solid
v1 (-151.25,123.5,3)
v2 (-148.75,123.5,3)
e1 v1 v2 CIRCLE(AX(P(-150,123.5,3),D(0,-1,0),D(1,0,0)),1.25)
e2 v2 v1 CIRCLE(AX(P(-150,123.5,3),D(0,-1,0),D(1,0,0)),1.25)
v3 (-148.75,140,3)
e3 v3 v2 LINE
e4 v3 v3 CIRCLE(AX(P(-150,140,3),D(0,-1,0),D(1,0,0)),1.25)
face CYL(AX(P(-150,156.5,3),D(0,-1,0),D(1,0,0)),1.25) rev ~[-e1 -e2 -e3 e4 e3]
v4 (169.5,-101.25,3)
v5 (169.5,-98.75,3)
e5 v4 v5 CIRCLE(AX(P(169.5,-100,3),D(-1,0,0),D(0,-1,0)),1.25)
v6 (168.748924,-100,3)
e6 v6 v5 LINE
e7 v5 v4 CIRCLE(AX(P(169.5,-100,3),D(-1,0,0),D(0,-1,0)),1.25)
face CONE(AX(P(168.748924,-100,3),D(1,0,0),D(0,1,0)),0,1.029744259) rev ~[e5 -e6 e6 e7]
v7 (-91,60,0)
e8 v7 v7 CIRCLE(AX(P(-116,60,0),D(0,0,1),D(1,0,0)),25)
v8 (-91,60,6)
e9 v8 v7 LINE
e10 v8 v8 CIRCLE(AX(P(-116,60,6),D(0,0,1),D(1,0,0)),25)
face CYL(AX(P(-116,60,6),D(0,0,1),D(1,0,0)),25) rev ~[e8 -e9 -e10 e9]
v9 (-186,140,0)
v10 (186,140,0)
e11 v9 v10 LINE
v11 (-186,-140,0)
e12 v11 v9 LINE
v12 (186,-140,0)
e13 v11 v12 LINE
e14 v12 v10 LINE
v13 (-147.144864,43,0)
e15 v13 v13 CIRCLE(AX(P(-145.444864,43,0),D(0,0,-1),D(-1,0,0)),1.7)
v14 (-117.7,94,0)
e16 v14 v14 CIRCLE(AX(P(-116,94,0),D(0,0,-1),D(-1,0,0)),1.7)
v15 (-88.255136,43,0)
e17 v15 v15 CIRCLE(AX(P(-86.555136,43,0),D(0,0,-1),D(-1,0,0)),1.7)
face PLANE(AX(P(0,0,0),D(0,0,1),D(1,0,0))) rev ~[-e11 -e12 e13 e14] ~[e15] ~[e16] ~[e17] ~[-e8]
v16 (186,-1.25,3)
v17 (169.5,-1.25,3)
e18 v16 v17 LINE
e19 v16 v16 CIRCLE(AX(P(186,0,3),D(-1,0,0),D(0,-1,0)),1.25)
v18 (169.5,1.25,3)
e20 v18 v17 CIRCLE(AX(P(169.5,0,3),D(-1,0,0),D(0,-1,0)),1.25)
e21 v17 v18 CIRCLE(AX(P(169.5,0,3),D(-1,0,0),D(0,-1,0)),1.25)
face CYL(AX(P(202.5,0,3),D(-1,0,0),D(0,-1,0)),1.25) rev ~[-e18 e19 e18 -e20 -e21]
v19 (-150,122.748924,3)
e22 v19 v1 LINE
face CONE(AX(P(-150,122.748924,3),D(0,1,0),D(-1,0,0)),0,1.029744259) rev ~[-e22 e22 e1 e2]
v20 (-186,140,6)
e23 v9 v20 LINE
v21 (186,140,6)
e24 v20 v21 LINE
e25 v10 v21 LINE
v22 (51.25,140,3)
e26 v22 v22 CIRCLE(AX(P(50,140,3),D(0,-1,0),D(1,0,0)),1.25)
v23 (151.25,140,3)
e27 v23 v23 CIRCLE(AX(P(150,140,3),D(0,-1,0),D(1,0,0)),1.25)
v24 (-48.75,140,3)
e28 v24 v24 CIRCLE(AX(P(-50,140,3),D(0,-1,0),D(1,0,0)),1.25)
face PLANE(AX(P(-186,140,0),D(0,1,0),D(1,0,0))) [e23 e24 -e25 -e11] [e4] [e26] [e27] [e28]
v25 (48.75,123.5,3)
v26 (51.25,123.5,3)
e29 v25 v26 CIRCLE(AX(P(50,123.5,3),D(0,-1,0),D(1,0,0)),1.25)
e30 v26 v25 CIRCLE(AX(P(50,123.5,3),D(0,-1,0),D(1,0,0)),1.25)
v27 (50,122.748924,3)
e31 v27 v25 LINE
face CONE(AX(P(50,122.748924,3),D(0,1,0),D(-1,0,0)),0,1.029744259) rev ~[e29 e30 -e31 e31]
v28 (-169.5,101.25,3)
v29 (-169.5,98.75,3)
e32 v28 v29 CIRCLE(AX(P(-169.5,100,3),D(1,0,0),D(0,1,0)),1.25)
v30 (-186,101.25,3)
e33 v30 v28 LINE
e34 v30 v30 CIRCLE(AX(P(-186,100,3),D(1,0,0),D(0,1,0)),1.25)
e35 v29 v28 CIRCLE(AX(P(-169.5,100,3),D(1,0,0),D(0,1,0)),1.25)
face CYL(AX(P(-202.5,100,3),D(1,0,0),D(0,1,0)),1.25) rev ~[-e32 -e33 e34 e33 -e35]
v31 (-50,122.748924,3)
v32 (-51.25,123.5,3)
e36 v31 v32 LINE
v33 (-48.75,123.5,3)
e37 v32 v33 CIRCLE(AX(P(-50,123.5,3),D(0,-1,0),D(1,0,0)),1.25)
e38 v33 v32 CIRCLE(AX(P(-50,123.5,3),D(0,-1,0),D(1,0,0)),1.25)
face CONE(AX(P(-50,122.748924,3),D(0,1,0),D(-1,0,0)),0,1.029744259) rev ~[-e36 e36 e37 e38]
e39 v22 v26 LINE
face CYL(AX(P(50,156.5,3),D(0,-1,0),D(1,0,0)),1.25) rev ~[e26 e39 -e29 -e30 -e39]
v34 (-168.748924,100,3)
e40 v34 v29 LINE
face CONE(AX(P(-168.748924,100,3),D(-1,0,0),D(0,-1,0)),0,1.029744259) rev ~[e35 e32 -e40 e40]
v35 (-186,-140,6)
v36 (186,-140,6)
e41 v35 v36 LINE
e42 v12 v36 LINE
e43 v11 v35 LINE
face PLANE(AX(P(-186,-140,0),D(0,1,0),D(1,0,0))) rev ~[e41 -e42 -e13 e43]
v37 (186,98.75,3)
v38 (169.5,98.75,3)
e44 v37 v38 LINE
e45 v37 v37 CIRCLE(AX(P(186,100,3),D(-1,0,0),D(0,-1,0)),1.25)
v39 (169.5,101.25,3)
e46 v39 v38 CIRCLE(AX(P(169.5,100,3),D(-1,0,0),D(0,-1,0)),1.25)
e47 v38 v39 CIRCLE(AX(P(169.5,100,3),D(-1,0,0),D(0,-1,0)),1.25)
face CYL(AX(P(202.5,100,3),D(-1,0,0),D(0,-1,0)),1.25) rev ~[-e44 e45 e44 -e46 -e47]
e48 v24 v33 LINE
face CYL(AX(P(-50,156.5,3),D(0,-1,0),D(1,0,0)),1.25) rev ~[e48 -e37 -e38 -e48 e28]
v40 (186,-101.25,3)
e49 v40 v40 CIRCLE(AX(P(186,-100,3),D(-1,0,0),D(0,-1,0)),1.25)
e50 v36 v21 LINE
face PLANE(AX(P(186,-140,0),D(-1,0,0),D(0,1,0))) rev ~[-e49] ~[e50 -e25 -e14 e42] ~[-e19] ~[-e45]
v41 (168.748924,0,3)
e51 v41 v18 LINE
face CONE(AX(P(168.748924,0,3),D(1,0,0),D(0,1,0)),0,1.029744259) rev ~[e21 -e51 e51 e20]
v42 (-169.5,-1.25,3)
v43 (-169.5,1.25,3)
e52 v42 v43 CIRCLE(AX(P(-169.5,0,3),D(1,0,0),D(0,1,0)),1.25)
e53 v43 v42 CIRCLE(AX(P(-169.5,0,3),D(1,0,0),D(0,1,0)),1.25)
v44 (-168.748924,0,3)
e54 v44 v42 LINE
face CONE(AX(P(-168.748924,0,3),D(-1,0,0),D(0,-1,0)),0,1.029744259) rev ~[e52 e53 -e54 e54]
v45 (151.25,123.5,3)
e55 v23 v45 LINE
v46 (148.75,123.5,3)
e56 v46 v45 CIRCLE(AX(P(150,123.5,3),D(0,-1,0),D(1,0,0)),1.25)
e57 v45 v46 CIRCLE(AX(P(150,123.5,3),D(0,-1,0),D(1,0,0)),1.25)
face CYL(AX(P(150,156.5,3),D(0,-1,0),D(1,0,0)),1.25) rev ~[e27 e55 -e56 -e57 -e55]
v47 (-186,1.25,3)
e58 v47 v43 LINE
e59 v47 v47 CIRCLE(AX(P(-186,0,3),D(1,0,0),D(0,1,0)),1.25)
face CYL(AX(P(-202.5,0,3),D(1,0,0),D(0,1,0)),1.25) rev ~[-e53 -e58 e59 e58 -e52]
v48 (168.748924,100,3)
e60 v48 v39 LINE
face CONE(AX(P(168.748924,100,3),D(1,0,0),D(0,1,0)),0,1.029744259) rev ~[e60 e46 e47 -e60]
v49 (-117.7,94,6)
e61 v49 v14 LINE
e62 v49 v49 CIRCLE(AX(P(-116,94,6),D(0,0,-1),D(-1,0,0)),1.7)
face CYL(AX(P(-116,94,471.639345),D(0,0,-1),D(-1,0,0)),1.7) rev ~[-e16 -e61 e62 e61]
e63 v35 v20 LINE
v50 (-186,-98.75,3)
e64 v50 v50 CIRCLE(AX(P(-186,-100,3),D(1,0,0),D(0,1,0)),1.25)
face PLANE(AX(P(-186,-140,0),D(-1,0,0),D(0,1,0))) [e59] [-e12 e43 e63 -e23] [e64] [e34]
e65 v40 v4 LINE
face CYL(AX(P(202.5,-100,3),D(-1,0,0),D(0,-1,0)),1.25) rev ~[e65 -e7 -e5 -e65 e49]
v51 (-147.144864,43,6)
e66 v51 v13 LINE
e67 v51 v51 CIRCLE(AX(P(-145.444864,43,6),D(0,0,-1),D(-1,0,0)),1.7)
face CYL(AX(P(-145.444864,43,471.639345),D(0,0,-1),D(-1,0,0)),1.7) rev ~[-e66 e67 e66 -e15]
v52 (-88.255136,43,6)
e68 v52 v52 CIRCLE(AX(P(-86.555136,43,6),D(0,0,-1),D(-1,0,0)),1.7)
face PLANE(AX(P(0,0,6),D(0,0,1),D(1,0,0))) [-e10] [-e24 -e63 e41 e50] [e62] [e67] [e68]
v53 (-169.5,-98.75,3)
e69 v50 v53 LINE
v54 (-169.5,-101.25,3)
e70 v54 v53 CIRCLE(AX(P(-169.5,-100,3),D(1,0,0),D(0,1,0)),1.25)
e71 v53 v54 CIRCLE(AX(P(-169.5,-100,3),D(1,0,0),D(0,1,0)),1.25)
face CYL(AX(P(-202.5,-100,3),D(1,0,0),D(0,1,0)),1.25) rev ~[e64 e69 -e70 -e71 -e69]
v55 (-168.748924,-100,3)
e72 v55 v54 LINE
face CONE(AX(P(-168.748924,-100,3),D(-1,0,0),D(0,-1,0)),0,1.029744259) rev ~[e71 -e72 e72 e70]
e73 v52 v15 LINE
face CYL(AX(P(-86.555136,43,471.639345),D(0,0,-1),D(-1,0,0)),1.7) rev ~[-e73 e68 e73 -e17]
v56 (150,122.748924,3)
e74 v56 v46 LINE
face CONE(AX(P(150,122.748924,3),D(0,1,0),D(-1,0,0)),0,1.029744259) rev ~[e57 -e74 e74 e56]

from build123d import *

# Parameters (mm, degrees)
F0_W           = 372
F0_H           = 280
F1_DEPTH       = 6
F2_R           = 25
F3_DEPTH       = 6
F5_D           = 3.4
F9_D           = 2.5
F9_DEPTH       = 16.5
F9_TIP         = 0.7510757738
F9_ON_F8_D     = 2.5
F9_ON_F8_DEPTH = 16.5
F9_ON_F8_TIP   = 0.7510757738
F9_ON_F7_D     = 2.5
F9_ON_F7_DEPTH = 16.5
F9_ON_F7_TIP   = 0.7510757738
F10_D          = 2.5
F10_DEPTH      = 16.5
F10_TIP        = 0.7510757738


# Not quite as in the source:
# - a feature names something its author has since deleted; it is built from what else it names


with BuildPart() as f1:
    # F0 (on Top) → F1 (new body)
    with BuildSketch(Plane.XY):
        Rectangle(F0_W, F0_H)
    extrude(amount=F1_DEPTH)


with BuildPart() as f3:
    # F2 (on face) → F3 (new body)
    with BuildSketch(Plane.XY.offset(6)):
        with Locations((-116, 60)):
            Circle(F2_R)
    extrude(amount=-F3_DEPTH)


with BuildPart() as f1_1:
    add(f1.part)

    # F4: cut F3
    add(f3.part, mode=Mode.SUBTRACT)

    # F5 (through all)
    with Locations(Plane.XY.offset(6)):
        with Locations((-116, 94), (-145.4448637287, 43), (-86.5551362713, 43)):
            Hole(F5_D / 2)

    # F9
    with Locations(Plane.YZ.offset(186)):
        with Locations((-100, 3), (0, 3), (100, 3)):
            Hole(F9_D / 2, depth=F9_DEPTH)
            with Locations((0, 0, -(F9_DEPTH + F9_TIP / 2))):  # 118° drill point
                Cone(0, F9_D / 2, F9_TIP, mode=Mode.SUBTRACT)

    # F9 on F8
    with Locations(Plane(origin=(0, 140, 0), x_dir=(-1, 0, 0), z_dir=(0, 1, 0))):
        with Locations((-150, 3), (-50, 3), (50, 3)):
            Hole(F9_ON_F8_D / 2, depth=F9_ON_F8_DEPTH)
            with Locations((0, 0, -(F9_ON_F8_DEPTH + F9_ON_F8_TIP / 2))):  # 118° drill point
                Cone(0, F9_ON_F8_D / 2, F9_ON_F8_TIP, mode=Mode.SUBTRACT)

    # F9 on F7
    with Locations(Plane(origin=(-186, 0, 0), x_dir=(0, -1, 0), z_dir=(-1, 0, 0))):
        with Locations((-100, 3), (0, 3), (100, 3)):
            Hole(F9_ON_F7_D / 2, depth=F9_ON_F7_DEPTH)
            with Locations((0, 0, -(F9_ON_F7_DEPTH + F9_ON_F7_TIP / 2))):  # 118° drill point
                Cone(0, F9_ON_F7_D / 2, F9_ON_F7_TIP, mode=Mode.SUBTRACT)

    # F10
    with Locations(Plane(origin=(0, 140, 0), x_dir=(-1, 0, 0), z_dir=(0, 1, 0))):
        with Locations((150, 3)):
            Hole(F10_D / 2, depth=F10_DEPTH)
            with Locations((0, 0, -(F10_DEPTH + F10_TIP / 2))):  # 118° drill point
                Cone(0, F10_D / 2, F10_TIP, mode=Mode.SUBTRACT)


solid = f1_1.part
